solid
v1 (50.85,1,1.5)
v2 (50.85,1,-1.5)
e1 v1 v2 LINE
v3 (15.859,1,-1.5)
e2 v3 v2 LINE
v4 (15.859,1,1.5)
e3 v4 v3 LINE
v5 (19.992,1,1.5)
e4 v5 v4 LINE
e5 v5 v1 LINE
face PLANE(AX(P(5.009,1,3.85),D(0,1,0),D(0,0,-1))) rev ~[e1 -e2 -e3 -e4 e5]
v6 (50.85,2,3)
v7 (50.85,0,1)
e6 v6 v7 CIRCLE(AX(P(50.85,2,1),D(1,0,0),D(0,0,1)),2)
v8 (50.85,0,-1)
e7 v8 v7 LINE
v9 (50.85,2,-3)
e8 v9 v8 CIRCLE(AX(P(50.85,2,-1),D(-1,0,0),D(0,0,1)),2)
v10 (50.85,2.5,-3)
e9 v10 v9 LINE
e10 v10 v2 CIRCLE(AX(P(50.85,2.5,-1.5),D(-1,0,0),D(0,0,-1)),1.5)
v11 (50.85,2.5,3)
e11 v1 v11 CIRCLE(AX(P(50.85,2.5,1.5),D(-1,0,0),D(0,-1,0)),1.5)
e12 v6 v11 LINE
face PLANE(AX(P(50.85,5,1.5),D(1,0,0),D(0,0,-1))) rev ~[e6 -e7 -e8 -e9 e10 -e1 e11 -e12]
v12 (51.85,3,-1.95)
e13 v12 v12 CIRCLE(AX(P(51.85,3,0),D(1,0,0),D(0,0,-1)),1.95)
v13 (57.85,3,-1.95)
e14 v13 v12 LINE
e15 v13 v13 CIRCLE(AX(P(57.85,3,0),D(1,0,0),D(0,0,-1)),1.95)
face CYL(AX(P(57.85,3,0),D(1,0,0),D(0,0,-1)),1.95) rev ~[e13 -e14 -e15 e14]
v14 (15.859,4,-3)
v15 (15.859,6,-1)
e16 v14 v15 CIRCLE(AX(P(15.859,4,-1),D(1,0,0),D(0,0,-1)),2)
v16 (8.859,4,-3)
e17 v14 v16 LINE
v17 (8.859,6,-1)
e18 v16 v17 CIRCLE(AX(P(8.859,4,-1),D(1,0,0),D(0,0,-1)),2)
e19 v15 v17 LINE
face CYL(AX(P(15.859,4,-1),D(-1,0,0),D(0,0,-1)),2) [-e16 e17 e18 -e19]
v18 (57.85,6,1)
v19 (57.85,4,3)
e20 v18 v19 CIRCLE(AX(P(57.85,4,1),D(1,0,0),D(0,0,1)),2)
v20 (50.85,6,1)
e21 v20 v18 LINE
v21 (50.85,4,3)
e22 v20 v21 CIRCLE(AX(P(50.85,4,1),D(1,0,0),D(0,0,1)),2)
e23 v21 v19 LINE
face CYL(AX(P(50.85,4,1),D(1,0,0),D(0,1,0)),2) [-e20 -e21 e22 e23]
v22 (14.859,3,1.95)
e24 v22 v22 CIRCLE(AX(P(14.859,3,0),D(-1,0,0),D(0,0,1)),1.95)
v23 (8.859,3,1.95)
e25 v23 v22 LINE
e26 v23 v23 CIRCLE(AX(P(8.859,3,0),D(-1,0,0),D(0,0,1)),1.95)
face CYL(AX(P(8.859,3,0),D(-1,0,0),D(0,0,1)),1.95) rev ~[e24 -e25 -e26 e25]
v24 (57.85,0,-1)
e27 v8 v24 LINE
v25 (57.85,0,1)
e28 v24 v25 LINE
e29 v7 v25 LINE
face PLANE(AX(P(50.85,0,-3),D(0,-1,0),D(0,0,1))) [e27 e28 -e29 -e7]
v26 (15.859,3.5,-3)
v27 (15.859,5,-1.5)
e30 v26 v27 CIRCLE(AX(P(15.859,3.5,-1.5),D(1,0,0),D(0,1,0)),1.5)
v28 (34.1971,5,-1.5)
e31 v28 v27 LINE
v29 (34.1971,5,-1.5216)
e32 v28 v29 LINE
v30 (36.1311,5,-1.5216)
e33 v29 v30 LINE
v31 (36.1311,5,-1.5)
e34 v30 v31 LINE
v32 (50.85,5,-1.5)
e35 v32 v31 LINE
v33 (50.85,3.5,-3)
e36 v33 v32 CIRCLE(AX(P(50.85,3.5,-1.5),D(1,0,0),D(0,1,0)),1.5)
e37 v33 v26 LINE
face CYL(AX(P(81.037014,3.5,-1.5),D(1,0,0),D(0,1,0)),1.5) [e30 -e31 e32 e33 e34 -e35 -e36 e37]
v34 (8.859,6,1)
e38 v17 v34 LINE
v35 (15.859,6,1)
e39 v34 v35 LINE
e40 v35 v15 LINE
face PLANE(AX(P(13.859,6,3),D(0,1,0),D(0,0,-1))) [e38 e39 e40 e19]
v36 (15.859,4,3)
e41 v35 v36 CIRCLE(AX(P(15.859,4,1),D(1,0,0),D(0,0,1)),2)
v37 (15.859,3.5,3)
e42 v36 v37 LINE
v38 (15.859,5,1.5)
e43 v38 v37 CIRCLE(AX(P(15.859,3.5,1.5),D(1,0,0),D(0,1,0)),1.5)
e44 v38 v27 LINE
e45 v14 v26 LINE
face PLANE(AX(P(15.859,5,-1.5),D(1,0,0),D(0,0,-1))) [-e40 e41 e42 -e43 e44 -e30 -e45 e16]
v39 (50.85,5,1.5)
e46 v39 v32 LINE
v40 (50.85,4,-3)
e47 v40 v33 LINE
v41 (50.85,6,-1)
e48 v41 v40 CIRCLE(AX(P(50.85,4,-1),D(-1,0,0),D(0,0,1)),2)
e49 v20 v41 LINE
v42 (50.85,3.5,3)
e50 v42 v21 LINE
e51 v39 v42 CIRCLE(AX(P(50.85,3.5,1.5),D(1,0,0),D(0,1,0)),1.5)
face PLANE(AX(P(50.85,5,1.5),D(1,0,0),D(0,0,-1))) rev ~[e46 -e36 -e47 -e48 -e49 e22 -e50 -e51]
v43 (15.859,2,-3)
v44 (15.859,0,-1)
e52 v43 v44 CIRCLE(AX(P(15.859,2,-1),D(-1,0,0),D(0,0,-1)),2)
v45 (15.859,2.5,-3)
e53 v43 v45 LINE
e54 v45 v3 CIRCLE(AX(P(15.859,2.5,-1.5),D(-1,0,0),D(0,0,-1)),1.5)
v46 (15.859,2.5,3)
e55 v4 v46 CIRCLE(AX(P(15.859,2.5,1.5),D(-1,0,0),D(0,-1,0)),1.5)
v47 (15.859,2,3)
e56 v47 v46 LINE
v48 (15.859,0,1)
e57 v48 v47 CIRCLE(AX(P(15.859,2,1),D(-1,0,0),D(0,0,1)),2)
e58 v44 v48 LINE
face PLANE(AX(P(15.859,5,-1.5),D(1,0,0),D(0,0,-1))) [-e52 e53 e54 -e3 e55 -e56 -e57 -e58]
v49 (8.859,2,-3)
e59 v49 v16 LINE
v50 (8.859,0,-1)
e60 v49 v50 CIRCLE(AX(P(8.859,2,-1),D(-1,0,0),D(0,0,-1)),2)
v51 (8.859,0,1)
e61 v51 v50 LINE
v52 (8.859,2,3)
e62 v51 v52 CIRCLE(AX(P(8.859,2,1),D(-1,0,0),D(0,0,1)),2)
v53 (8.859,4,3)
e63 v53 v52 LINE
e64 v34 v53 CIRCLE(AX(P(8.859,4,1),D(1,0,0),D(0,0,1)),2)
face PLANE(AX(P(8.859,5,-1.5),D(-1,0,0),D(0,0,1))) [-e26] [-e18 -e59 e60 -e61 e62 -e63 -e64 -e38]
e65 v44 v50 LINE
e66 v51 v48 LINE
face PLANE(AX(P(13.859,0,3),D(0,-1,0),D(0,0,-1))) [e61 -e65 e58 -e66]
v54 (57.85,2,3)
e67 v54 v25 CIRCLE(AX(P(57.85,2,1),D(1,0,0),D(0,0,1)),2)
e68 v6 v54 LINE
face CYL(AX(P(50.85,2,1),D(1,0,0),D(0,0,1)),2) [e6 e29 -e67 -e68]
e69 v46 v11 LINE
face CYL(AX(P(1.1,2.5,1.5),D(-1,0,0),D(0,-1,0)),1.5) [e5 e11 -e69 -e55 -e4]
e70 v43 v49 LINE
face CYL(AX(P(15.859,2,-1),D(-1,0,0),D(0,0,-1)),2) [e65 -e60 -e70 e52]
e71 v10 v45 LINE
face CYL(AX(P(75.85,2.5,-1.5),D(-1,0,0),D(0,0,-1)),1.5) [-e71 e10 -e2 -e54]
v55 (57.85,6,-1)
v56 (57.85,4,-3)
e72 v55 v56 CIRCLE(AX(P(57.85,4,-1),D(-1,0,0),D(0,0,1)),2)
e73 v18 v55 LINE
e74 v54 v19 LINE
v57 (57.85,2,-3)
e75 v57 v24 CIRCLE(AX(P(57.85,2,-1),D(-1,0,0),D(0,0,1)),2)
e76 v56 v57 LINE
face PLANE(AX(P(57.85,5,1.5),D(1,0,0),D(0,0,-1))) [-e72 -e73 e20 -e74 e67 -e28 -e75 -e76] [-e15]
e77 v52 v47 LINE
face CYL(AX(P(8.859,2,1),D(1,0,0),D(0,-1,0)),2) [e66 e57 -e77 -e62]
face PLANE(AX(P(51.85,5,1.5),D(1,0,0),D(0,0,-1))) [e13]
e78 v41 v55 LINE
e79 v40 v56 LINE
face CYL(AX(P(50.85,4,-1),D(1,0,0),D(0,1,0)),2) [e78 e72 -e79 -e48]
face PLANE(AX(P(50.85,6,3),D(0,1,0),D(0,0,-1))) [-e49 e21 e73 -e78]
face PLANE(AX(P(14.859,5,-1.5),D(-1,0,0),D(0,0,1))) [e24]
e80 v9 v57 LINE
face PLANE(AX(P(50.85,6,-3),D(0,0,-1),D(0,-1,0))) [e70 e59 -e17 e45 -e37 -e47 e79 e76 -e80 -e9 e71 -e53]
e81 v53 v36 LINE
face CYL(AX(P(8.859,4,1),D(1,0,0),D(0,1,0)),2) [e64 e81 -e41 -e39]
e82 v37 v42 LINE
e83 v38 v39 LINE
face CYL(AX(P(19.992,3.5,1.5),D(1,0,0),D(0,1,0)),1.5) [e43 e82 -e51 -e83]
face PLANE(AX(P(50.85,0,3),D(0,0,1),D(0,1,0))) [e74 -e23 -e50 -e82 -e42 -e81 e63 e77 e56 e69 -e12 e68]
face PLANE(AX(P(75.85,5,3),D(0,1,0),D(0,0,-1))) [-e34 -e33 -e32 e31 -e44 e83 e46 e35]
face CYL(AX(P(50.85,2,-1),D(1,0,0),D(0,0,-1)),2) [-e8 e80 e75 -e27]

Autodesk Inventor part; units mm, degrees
ref_plane "YZ Plane" through (0, 0, 0) normal (1, 0, 0) x (0, 1, 0)
ref_plane "XZ Plane" through (0, 0, 0) normal (0, 1, 0) x (-1, 0, 0)
ref_plane "XY Plane" through (0, 0, 0) normal (0, 0, 1) x (1, 0, 0)
sketch "Sketch1" plane through (0, 0, 0) normal (0, 1, 0) x (-1, 0, 0)
  point P0 (0, 0)
sketch "Sketch2" plane through (0, 0, 0) normal (0, 1, 0) x (-1, 0, 0)
  circle A0 centre (0, 0) radius 3.85
  dimension "d0" = 7.7
extrude "Extrusion1" add sketch "Sketch2" along normal blind 6
sketch "Sketch3" plane through (0, 6, 0) normal (0, 1, 0) x (1, 0, 0)
  circle A0 centre (0, 0) radius 1
  dimension "d3" = 2
extrude "Extrusion2" cut sketch "Sketch3" against normal through all
sketch "Sketch4" plane through (0, 0, 0) normal (0, -1, 0) x (1, 0, 0)
  circle A0 centre (0, 0) radius 3.85 projected
  line L0 (0, 3.85) -> (3.85, 3.85)
  line L1 (3.85, 3.85) -> (3.85, -3.85)
  line L2 (3.85, -3.85) -> (0, -3.85)
  line L3 (3.85, 3.85) -> (4.85, 3.85)
  line L4 (4.85, 3.85) -> (4.85, -3.85)
  line L5 (4.85, -3.85) -> (3.85, -3.85)
  line L6 (3.85, -3.85) -> (3.85, 3.85)
  line L7 (4.85, 3.85) -> (4.85, 3)
  line L8 (4.85, -3.85) -> (4.85, -3)
  line L9 (4.85, 3) -> (3.85, 3)
  line L10 (3.85, 3) -> (3.85, -3)
  line L11 (3.85, -3) -> (4.85, -3)
  line L12 (4.85, -3) -> (4.85, 3)
  point P0 (3.85, -3)
  dimension "d6" = 1
  dimension "d7" = 0.85
  dimension "d8" = 0.85
extrude "Extrusion3" add sketch "Sketch4" against normal blind 6 contours L1 L9 L4 L11
sketch "Sketch5" plane through (4.85, 0, 3) normal (1, 0, 0) x (0, 0, -1)
  line L0 (6.85, 0) -> (-0.85, 0) projected
  line L1 (6, 0) -> (6, 6) projected
  line L2 (0.0003, 0) -> (6, 0)
  line L3 (6, 0) -> (6, 1)
  line L4 (6, 1) -> (0.0003, 1)
  line L5 (0.0003, 1) -> (0.0003, 0)
  line L6 (6.85, 6) -> (-0.85, 6) projected
  line L7 (0.0003, 6) -> (6, 6)
  line L8 (6, 6) -> (6, 5)
  line L9 (6, 5) -> (0.0003, 5)
  line L10 (0.0003, 5) -> (0.0003, 6)
  point P0 (3, 0)
  point P1 (3, 6)
  dimension "d11" = 1
  dimension "d12" = 1
extrude "Extrusion4" cut sketch "Sketch5" against normal blind 1 contours L9 L10 L6 L1
extrude "Extrusion5" cut sketch "Sketch5" against normal blind 1 contours L0 L5 L4 L1
sketch "Sketch6" plane through (4.85, 5, 2.9997) normal (0, 0, -1) x (-1, 0, 0)
  line L0 (0, 0) -> (1, 0) projected
  line L1 (0, -5) -> (0, 1) projected
  line L2 (1, 0) -> (0, 0)
  line L3 (0, 0) -> (0, 1)
  line L4 (0, 1) -> (1, 1)
  line L5 (1, 1) -> (1, 0)
  line L6 (1, -5) -> (0, -5)
  line L7 (0, -5) -> (0, -3.9916)
  line L8 (0, -3.9916) -> (1, -3.9916)
  line L9 (1, -3.9916) -> (1, -5)
  point P0 (4.85, -5)
extrude "Extrusion6" cut sketch "Sketch6" against normal through all contours L1 L4 L5 L0
extrude "Extrusion7" cut sketch "Sketch6" against normal through all contours L1 L8 L9 L6
sketch "Sketch7" plane through (4.85, 5, 3) normal (1, 0, 0) x (0, 0, -1)
  line L0 (0, 0) -> (3, 0) projected
  line L1 (6, -4) -> (6, 0) projected
  line L2 (0, 0) -> (6, 0)
  line L3 (6, 0) -> (6, -4)
  line L4 (6, -4) -> (0, -4)
  line L5 (0, -4) -> (0, 0)
  point P0 (3, -5)
extrude "Extrusion8" add sketch "Sketch7" along normal blind 71
sketch "Sketch8" plane through (3.85, 1, -3) normal (0, 0, -1) x (-1, 0, 0)
  point P0 (3.85, -1)
sketch "Sketch9" plane through (3.85, 5, 0) normal (0, 1, 0) x (1, 0, 0)
  line L0 (72, 3) -> (72, -3) projected
  line L1 (72, 0) -> (75.85, 0)
  circle A0 centre (75.85, 0) radius 3.85
  point P0 (-3.85, 0)
  dimension "d23" = 3.85
extrude "Extrusion9" add sketch "Sketch9" along normal blind 1
extrude "Extrusion10" add sketch "Sketch9" against normal blind 5
sketch "Sketch10" plane through (79.7, 6, 0) normal (0, 1, 0) x (1, 0, 0)
  circle A0 centre (0, 0) radius 1.85
  point P0 (-79.7, 0)
  dimension "d28" = 3.7
extrude "Extrusion11" cut sketch "Sketch10" against normal through all
sketch "Sketch11" plane through (3.85, 5, 0) normal (-1, 0, 0) x (0, 0, 1)
  point P0 (0, -5)
sketch "Sketch12" plane through (3.85, 5, -3) normal (-1, 0, 0) x (0, 0, 1)
  line L0 (0, 0) -> (3, 0) projected
  line L1 (6, 0) -> (6, -4) projected
  line L2 (0, 0) -> (6, 0)
  line L3 (6, 0) -> (6, -4)
  line L4 (6, -4) -> (0, -4)
  line L5 (0, -4) -> (0, 0)
  point P0 (3, -5)
extrude "Extrusion12" add sketch "Sketch12" along normal blind 2
sketch "Sketch13" plane through (75.85, 5, 3) normal (1, 0, 0) x (0, 0, -1)
  line L0 (3, 0) -> (0, 0) projected
  line L1 (3, -4) -> (6, -4) projected
  line L2 (0, 0) -> (6, 0)
  line L3 (6, 0) -> (6, -4)
  line L4 (6, -4) -> (0, -4)
  line L5 (0, -4) -> (0, 0)
  point P0 (3, -5)
extrude "Extrusion13" add sketch "Sketch13" along normal blind 1.6
fillet "Fillet1" radius 1.5 2 edges at (76.5685, 5, 3) (39.1315, 5, 3)
fillet "Fillet2" radius 1.5 1 edges at (39.85, 5, -3)
fillet "Fillet3" radius 1.5 1 edges at (39.85, 1, -3)
fillet "Fillet4" radius 1.5 3 edges at (4.35, 1, 2.9997) (40.35, 1, 3) (4.85, 1, 2.9998)
sketch "Sketch14" plane through (3.5458, 5, 1.5) normal (0, 1, 0) x (1, 0, 0)
  point P0 (-3.5458, 1.5)
sketch "Sketch15" plane through (3.5458, 5, 1.5) normal (0, 1, 0) x (1, 0, 0)
  line L0 (0.4177, 2.9988) -> (2.9717, 2.9988) construction
  line L1 (2.9717, 2.9988) -> (2.9717, -0.0492) construction
  line L2 (2.9717, -0.0492) -> (0.4177, -0.0492) construction
  line L3 (0.4177, -0.0492) -> (0.4177, 2.9988) construction
  line L4 (0.398, -0.0492) -> (1.4255, 2.9988)
  line L5 (1.4255, 2.9988) -> (1.9244, 2.9988)
  line L6 (1.9244, 2.9988) -> (2.952, -0.0492)
  line L7 (2.952, -0.0492) -> (2.5247, -0.0492)
  line L8 (2.5247, -0.0492) -> (2.248, 0.803)
  line L9 (2.248, 0.803) -> (1.0846, 0.803)
  line L10 (1.0846, 0.803) -> (0.808, -0.0492)
  line L11 (0.808, -0.0492) -> (0.398, -0.0492)
  line L12 (2.1369, 1.1488) -> (1.6651, 2.5839)
  line L13 (1.6651, 2.5839) -> (1.1958, 1.1488)
  line L14 (1.1958, 1.1488) -> (2.1369, 1.1488)
  point P0 (-3.5458, 1.5)
extrude "Extrusion14" add sketch "Sketch15" along normal blind 0.2
sketch "Sketch16" plane through (3.5458, 5, -1.5) normal (0, 1, 0) x (1, 0, 0)
  line L0 (69.8363, -0.0038) -> (72.3064, -0.0038) construction
  line L1 (72.3064, -0.0038) -> (72.3064, -3.0518) construction
  line L2 (72.3064, -3.0518) -> (69.8363, -3.0518) construction
  line L3 (69.8363, -3.0518) -> (69.8363, -0.0038) construction
  spline S0 degree 2 poles (72.2125, -2.1157) (72.2125, -2.3429) (72.0396, -2.6912) (71.8963, -2.8048) knots 0 0 0 1 2 2 2
  spline S1 degree 2 poles (71.8963, -2.8048) (71.7234, -2.9382) (71.3307, -3.0518) (71.0195, -3.0518) knots 0 0 0 1 2 2 2
  line L4 (71.0195, -3.0518) -> (70.1451, -3.0518)
  line L5 (70.1451, -3.0518) -> (70.1451, -0.0038)
  line L6 (70.1451, -0.0038) -> (70.9528, -0.0038)
  spline S2 degree 2 poles (70.9528, -0.0038) (71.2788, -0.0038) (71.6049, -0.0458) (71.7531, -0.1273) knots 0 0 0 1 2 2 2
  spline S3 degree 2 poles (71.7531, -0.1273) (71.9186, -0.2138) (72.0692, -0.4978) (72.0692, -0.6905) knots 0 0 0 1 2 2 2
  spline S4 degree 2 poles (72.0692, -0.6905) (72.0692, -0.9054) (71.842, -1.2462) (71.6419, -1.3426) knots 0 0 0 1 2 2 2
  line L7 (71.6419, -1.3426) -> (71.6419, -1.3574)
  spline S5 degree 2 poles (71.6419, -1.3574) (71.9136, -1.4315) (72.2125, -1.8242) (72.2125, -2.1157) knots 0 0 0 1 2 2 2
  spline S6 degree 2 poles (71.7901, -2.133) (71.7901, -1.9601) (71.6913, -1.7378) (71.5431, -1.6587) knots 0 0 0 1 2 2 2
  spline S7 degree 2 poles (71.5431, -1.6587) (71.4468, -1.6093) (71.2195, -1.5797) (71.0096, -1.5797) knots 0 0 0 1 2 2 2
  line L8 (71.0096, -1.5797) -> (70.5502, -1.5797)
  line L9 (70.5502, -1.5797) -> (70.5502, -2.706)
  line L10 (70.5502, -2.706) -> (70.8787, -2.706)
  spline S8 degree 2 poles (70.8787, -2.706) (71.1454, -2.706) (71.4517, -2.6566) (71.5703, -2.5776) knots 0 0 0 1 2 2 2
  spline S9 degree 2 poles (71.5703, -2.5776) (71.6839, -2.4961) (71.7901, -2.2935) (71.7901, -2.133) knots 0 0 0 1 2 2 2
  spline S10 degree 2 poles (71.6469, -0.7473) (71.6469, -0.6386) (71.5728, -0.4756) (71.4912, -0.4287) knots 0 0 0 1 2 2 2
  spline S11 degree 2 poles (71.4912, -0.4287) (71.3924, -0.3743) (71.1529, -0.3496) (70.938, -0.3496) knots 0 0 0 1 2 2 2
  line L11 (70.938, -0.3496) -> (70.5502, -0.3496)
  line L12 (70.5502, -0.3496) -> (70.5502, -1.2413)
  line L13 (70.5502, -1.2413) -> (71.0096, -1.2413)
  spline S12 degree 2 poles (71.0096, -1.2413) (71.1998, -1.2413) (71.3801, -1.2018) (71.4764, -1.14) knots 0 0 0 1 2 2 2
  spline S13 degree 2 poles (71.4764, -1.14) (71.5703, -1.0807) (71.6469, -0.8905) (71.6469, -0.7473) knots 0 0 0 1 2 2 2
  point P0 (-3.5458, -1.5)
extrude "Extrusion15" add sketch "Sketch16" along normal blind 0.2
sketch "Sketch17" plane through (3.5458, 5, -1.5) normal (0, 1, 0) x (1, 0, 0)
  line L0 (0.4145, -1.5) -> (36.4145, -1.5)
  line L1 (30.4487, 0.0859) -> (55.6072, 0.0859) construction
  line L2 (55.6072, 0.0859) -> (55.6072, -2.5363) construction
  line L3 (55.6072, -2.5363) -> (30.4487, -2.5363) construction
  line L4 (30.4487, -2.5363) -> (30.4487, 0.0859) construction
  line L5 (32.5853, -0.4353) -> (31.2663, -3.0264)
  line L6 (31.2663, -3.0264) -> (30.8316, -3.0264)
  line L7 (30.8316, -3.0264) -> (32.2247, -0.3365)
  line L8 (32.2247, -0.3365) -> (30.6513, -0.3365)
  line L9 (30.6513, -0.3365) -> (30.6513, 0.0216)
  line L10 (30.6513, 0.0216) -> (32.5853, 0.0216)
  line L11 (32.5853, 0.0216) -> (32.5853, -0.4353)
  line L12 (34.838, -3.0264) -> (32.9583, -3.0264)
  line L13 (32.9583, -3.0264) -> (32.9583, -2.5941)
  spline S0 degree 2 poles (32.9583, -2.5941) (33.1608, -2.4039) (33.5214, -2.0507) (33.6943, -1.8605) knots 0 0 0 1 2 2 2
  spline S1 degree 2 poles (33.6943, -1.8605) (34.0426, -1.4777) (34.297, -1.0182) (34.297, -0.7737) knots 0 0 0 1 2 2 2
  spline S2 degree 2 poles (34.297, -0.7737) (34.297, -0.6453) (34.218, -0.4526) (34.1464, -0.3909) knots 0 0 0 1 2 2 2
  spline S3 degree 2 poles (34.1464, -0.3909) (34.0747, -0.3291) (33.887, -0.2674) (33.7734, -0.2674) knots 0 0 0 1 2 2 2
  spline S4 degree 2 poles (33.7734, -0.2674) (33.6647, -0.2674) (33.4424, -0.3217) (33.3411, -0.3637) knots 0 0 0 1 2 2 2
  spline S5 degree 2 poles (33.3411, -0.3637) (33.2547, -0.3983) (33.0941, -0.4971) (33.0447, -0.5317) knots 0 0 0 1 2 2 2
  line L14 (33.0447, -0.5317) -> (33.0225, -0.5317)
  line L15 (33.0225, -0.5317) -> (33.0225, -0.0969)
  spline S6 degree 2 poles (33.0225, -0.0969) (33.1485, -0.0352) (33.6005, 0.0859) (33.803, 0.0859) knots 0 0 0 1 2 2 2
  spline S7 degree 2 poles (33.803, 0.0859) (34.2303, 0.0859) (34.712, -0.3662) (34.712, -0.7515) knots 0 0 0 1 2 2 2
  spline S8 degree 2 poles (34.712, -0.7515) (34.712, -0.9318) (34.628, -1.2331) (34.5539, -1.3616) knots 0 0 0 1 2 2 2
  spline S9 degree 2 poles (34.5539, -1.3616) (34.4798, -1.495) (34.2649, -1.7568) (34.1464, -1.8828) knots 0 0 0 1 2 2 2
  spline S10 degree 2 poles (34.1464, -1.8828) (33.9537, -2.0927) (33.4819, -2.5422) (33.3411, -2.6732) knots 0 0 0 1 2 2 2
  line L16 (33.3411, -2.6732) -> (34.838, -2.6732)
  line L17 (34.838, -2.6732) -> (34.838, -3.0264)
  line L18 (37.8958, -3.0264) -> (37.8958, -1.7024)
  spline S11 degree 2 poles (37.8958, -1.7024) (37.8958, -1.5444) (37.8711, -1.2751) (37.8316, -1.201) knots 0 0 0 1 2 2 2
  spline S12 degree 2 poles (37.8316, -1.201) (37.7921, -1.1195) (37.6414, -1.0405) (37.5105, -1.0405) knots 0 0 0 1 2 2 2
  spline S13 degree 2 poles (37.5105, -1.0405) (37.392, -1.0405) (37.1203, -1.1862) (36.977, -1.3245) knots 0 0 0 1 2 2 2
  spline S14 degree 2 poles (36.977, -1.3245) (36.9795, -1.3591) (36.9844, -1.4554) (36.9844, -1.5197) knots 0 0 0 1 2 2 2
  line L19 (36.9844, -1.5197) -> (36.9844, -3.0264)
  line L20 (36.9844, -3.0264) -> (36.5991, -3.0264)
  line L21 (36.5991, -3.0264) -> (36.5991, -1.7024)
  spline S15 degree 2 poles (36.5991, -1.7024) (36.5991, -1.5444) (36.5744, -1.2751) (36.5349, -1.201) knots 0 0 0 1 2 2 2
  spline S16 degree 2 poles (36.5349, -1.201) (36.4953, -1.1195) (36.3447, -1.0405) (36.2138, -1.0405) knots 0 0 0 1 2 2 2
  spline S17 degree 2 poles (36.2138, -1.0405) (36.0903, -1.0405) (35.8161, -1.1961) (35.6876, -1.3171) knots 0 0 0 1 2 2 2
  line L22 (35.6876, -1.3171) -> (35.6876, -3.0264)
  line L23 (35.6876, -3.0264) -> (35.3023, -3.0264)
  line L24 (35.3023, -3.0264) -> (35.3023, -0.7391)
  line L25 (35.3023, -0.7391) -> (35.6876, -0.7391)
  line L26 (35.6876, -0.7391) -> (35.6876, -0.9911)
  spline S18 degree 2 poles (35.6876, -0.9911) (35.8383, -0.8404) (36.1347, -0.6749) (36.3126, -0.6749) knots 0 0 0 1 2 2 2
  spline S19 degree 2 poles (36.3126, -0.6749) (36.5151, -0.6749) (36.8288, -0.8602) (36.9103, -1.0701) knots 0 0 0 1 2 2 2
  spline S20 degree 2 poles (36.9103, -1.0701) (37.0857, -0.875) (37.4167, -0.6749) (37.6093, -0.6749) knots 0 0 0 1 2 2 2
  spline S21 degree 2 poles (37.6093, -0.6749) (37.7575, -0.6749) (37.9996, -0.7663) (38.0885, -0.87) knots 0 0 0 1 2 2 2
  spline S22 degree 2 poles (38.0885, -0.87) (38.1799, -0.9738) (38.2812, -1.285) (38.2812, -1.5197) knots 0 0 0 1 2 2 2
  line L27 (38.2812, -1.5197) -> (38.2812, -3.0264)
  line L28 (38.2812, -3.0264) -> (37.8958, -3.0264)
  line L29 (41.4156, -3.0264) -> (41.4156, -1.7024)
  spline S23 degree 2 poles (41.4156, -1.7024) (41.4156, -1.5444) (41.3909, -1.2751) (41.3514, -1.201) knots 0 0 0 1 2 2 2
  spline S24 degree 2 poles (41.3514, -1.201) (41.3119, -1.1195) (41.1612, -1.0405) (41.0303, -1.0405) knots 0 0 0 1 2 2 2
  spline S25 degree 2 poles (41.0303, -1.0405) (40.9117, -1.0405) (40.64, -1.1862) (40.4968, -1.3245) knots 0 0 0 1 2 2 2
  spline S26 degree 2 poles (40.4968, -1.3245) (40.4992, -1.3591) (40.5042, -1.4554) (40.5042, -1.5197) knots 0 0 0 1 2 2 2
  line L30 (40.5042, -1.5197) -> (40.5042, -3.0264)
  line L31 (40.5042, -3.0264) -> (40.1189, -3.0264)
  line L32 (40.1189, -3.0264) -> (40.1189, -1.7024)
  spline S27 degree 2 poles (40.1189, -1.7024) (40.1189, -1.5444) (40.0942, -1.2751) (40.0546, -1.201) knots 0 0 0 1 2 2 2
  spline S28 degree 2 poles (40.0546, -1.201) (40.0151, -1.1195) (39.8644, -1.0405) (39.7335, -1.0405) knots 0 0 0 1 2 2 2
  spline S29 degree 2 poles (39.7335, -1.0405) (39.61, -1.0405) (39.3359, -1.1961) (39.2074, -1.3171) knots 0 0 0 1 2 2 2
  line L33 (39.2074, -1.3171) -> (39.2074, -3.0264)
  line L34 (39.2074, -3.0264) -> (38.8221, -3.0264)
  line L35 (38.8221, -3.0264) -> (38.8221, -0.7391)
  line L36 (38.8221, -0.7391) -> (39.2074, -0.7391)
  line L37 (39.2074, -0.7391) -> (39.2074, -0.9911)
  spline S30 degree 2 poles (39.2074, -0.9911) (39.3581, -0.8404) (39.6545, -0.6749) (39.8323, -0.6749) knots 0 0 0 1 2 2 2
  spline S31 degree 2 poles (39.8323, -0.6749) (40.0349, -0.6749) (40.3486, -0.8602) (40.4301, -1.0701) knots 0 0 0 1 2 2 2
  spline S32 degree 2 poles (40.4301, -1.0701) (40.6054, -0.875) (40.9364, -0.6749) (41.1291, -0.6749) knots 0 0 0 1 2 2 2
  spline S33 degree 2 poles (41.1291, -0.6749) (41.2773, -0.6749) (41.5194, -0.7663) (41.6083, -0.87) knots 0 0 0 1 2 2 2
  spline S34 degree 2 poles (41.6083, -0.87) (41.6997, -0.9738) (41.8009, -1.285) (41.8009, -1.5197) knots 0 0 0 1 2 2 2
  line L38 (41.8009, -1.5197) -> (41.8009, -3.0264)
  line L39 (41.8009, -3.0264) -> (41.4156, -3.0264)
  point P0 (-3.5458, -1.5)
  dimension "d43" = 36
extrude "Extrusion16" add sketch "Sketch17" along normal blind 0.2
sketch "Sketch18" plane through (3.5458, 5.2, -1.5) normal (0, 1, 0) x (1, 0, 0)
  line L0 (29.8828, 2.0952) -> (43.3392, 2.0952)
  line L1 (43.3392, 2.0952) -> (43.3392, -5.5663)
  line L2 (43.3392, -5.5663) -> (29.8828, -5.5663)
  line L3 (29.8828, -5.5663) -> (29.8828, 2.0952)
  point P0 (-3.5458, -1.5)
extrude "Extrusion17" cut sketch "Sketch18" against normal blind 0.2
sketch "Sketch19" plane through (3.5458, 5.2, 1.5) normal (0, 1, 0) x (1, 0, 0)
  line L0 (0.3624, -0.1736) -> (3.3783, -0.1736)
  line L1 (3.3783, -0.1736) -> (3.3783, 3.2897)
  line L2 (3.3783, 3.2897) -> (0.3624, 3.2897)
  line L3 (0.3624, 3.2897) -> (0.3624, -0.1736)
  line L4 (72.2697, -0.5369) -> (69.8008, -0.5369)
  line L5 (69.8008, -0.5369) -> (69.8008, 3.7021)
  line L6 (69.8008, 3.7021) -> (72.2697, 3.7021)
  line L7 (72.2697, 3.7021) -> (72.2697, -0.5369)
  point P0 (-3.5458, 1.5)
extrude "Extrusion18" cut sketch "Sketch19" against normal blind 0.2 contours L3 L2 L1 L0
extrude "Extrusion19" cut sketch "Sketch19" against normal blind 0.2 contours L4 L5 L6 L7
sketch "Sketch20" plane through (79.7, 0, 0) normal (0, -1, 0) x (1, 0, 0)
  point P0 (-79.7, 0)
sketch "Sketch21" plane through (79.7, 6, 0) normal (0, 1, 0) x (1, 0, 0)
  circle A0 centre (0, 0) radius 1.95
  point P0 (-79.7, 0)
  dimension "d52" = 3.9
extrude "Extrusion20" cut sketch "Sketch21" against normal through all
sketch "Sketch22" plane through (0, 6, 0) normal (0, 1, 0) x (1, 0, 0)
  line L0 (0, 0) -> (0, -3.85)
  circle A0 centre (0, 0) radius 3.85 projected
  line L1 (0, -3.85) -> (3.85, -3.85)
  line L2 (3.85, -3.85) -> (-3.85, -3.85)
  line L3 (-3.85, -3.85) -> (-3.85, 3.85)
  line L4 (-3.85, 3.85) -> (3.85, 3.85)
  line L5 (3.85, 3.85) -> (3.85, -3.85)
extrude "Extrusion21" cut sketch "Sketch22" against normal through all contours A0
sketch "Sketch23" plane through (79.7, 5, 0) normal (0, 1, 0) x (1, 0, 0)
  arc A0 (-76.1542, -1.5) -> (-76.1542, 1.5) centre (-79.7, 0) ccw projected
  line L0 (-75.85, 0) -> (-77.9753, 0)
  line L1 (-77.9753, 0) -> (-77.9753, 3.5992)
  line L2 (-77.9753, 3.5992) -> (-75.85, 3.5992)
  line L3 (-75.85, 3.5992) -> (-75.85, 0)
  line L4 (-75.85, 0) -> (-77.9753, 0)
  line L5 (-77.9753, 0) -> (-77.9753, -3.4561)
  line L6 (-77.9753, -3.4561) -> (-75.85, -3.4561)
  line L7 (-75.85, -3.4561) -> (-75.85, 0)
  line L8 (-75.85, -3.4561) -> (-65.85, -3.4561)
  line L9 (-65.85, -3.4561) -> (-65.85, 3.5992)
  line L10 (-65.85, 3.5992) -> (-75.85, 3.5992)
  line L11 (-75.85, 3.5992) -> (-75.85, -3.4561)
  dimension "d57" = 10
extrude "Extrusion22" cut sketch "Sketch23" against normal through all contours L3 L10 L9 L8 L7
extrude "Extrusion23" cut sketch "Sketch23" against normal through all contours L7 L6 L5 L0
extrude "Extrusion24" cut sketch "Sketch23" against normal through all contours L0 L1 L2 L3
sketch "Sketch24" plane through (13.85, 5, -1.5) normal (-1, 0, 0) x (0, 0, 1)
  line L0 (-2.9013, -5) -> (5.7799, -5)
  line L1 (5.7799, -5) -> (5.7799, 1.344)
  line L2 (5.7799, 1.344) -> (-2.9013, 1.344)
  line L3 (-2.9013, 1.344) -> (-2.9013, -5)
  point P0 (1.5, -5)
extrude "Extrusion25" cut sketch "Sketch24" against normal blind 6.142
sketch "Sketch25" plane through (19.992, 5, -1.5) normal (-1, 0, 0) x (0, 0, 1)
  line L0 (-1.5, 0) -> (4.5, 0)
  line L1 (4.5, 0) -> (4.5, -4)
  line L2 (4.5, -4) -> (-1.5, -4)
  line L3 (-1.5, -4) -> (-1.5, 0)
  point P0 (1.5, -5)
  dimension "d66" = 6
  dimension "d67" = 4
extrude "Extrusion26" add sketch "Sketch25" along normal blind 6.133
sketch "Sketch26" plane through (79.7, 6, 0) normal (0, 1, 0) x (1, 0, 0)
  line L0 (-65.841, -3) -> (-65.841, 3) projected
  line L1 (-65.841, 0) -> (-69.691, 0)
  circle A0 centre (-69.691, 0) radius 3.85
  point P0 (-79.7, 0)
  dimension "d70" = 3.85
extrude "Extrusion27" add sketch "Sketch26" against normal blind 6
sketch "Sketch27" plane through (13.859, 5, -1.5) normal (-1, 0, 0) x (0, 0, 1)
  point P0 (1.5, -5)
sketch "Sketch28" plane through (13.859, 5, -1.5) normal (-1, 0, 0) x (0, 0, 1)
  line L0 (-1.5, 0) -> (-1.5, -4) projected
  line L1 (4.5, 0) -> (3, 0) projected
  line L2 (-1.5, -4) -> (4.5, -4)
  line L3 (4.5, -4) -> (4.5, 0)
  line L4 (4.5, 0) -> (-1.5, 0)
  line L5 (-1.5, 0) -> (-1.5, -4)
  point P0 (1.5, -5)
extrude "Extrusion28" add sketch "Sketch28" along normal blind 5
sketch "Sketch29" plane through (19.992, 3.5, 3) normal (0, 0, 1) x (1, 0, 0)
  point P0 (-19.992, -3.5)
sketch "Sketch30" plane through (79.7, 5, 0) normal (0, 1, 0) x (1, 0, 0)
  point P0 (-79.7, 0)
sketch "Sketch31" plane through (19.992, 5, -1.5) normal (1, 0, 0) x (0, 0, -1)
  arc A0 (-3, 0) -> (-4.5, -1.5) centre (-3, -1.5) ccw projected
  circle A1 centre (-3, -1.5) radius 1.5
  circle A2 centre (-3, -1.5) radius 1.5
  arc A3 (-4.5, -2.5) -> (-3, -4) centre (-3, -2.5) ccw projected
  circle A4 centre (-3, -2.5) radius 1.5
  arc A5 (0, -4) -> (1.5, -2.5) centre (0, -2.5) ccw projected
  circle A6 centre (0, -2.5) radius 1.5
  arc A7 (1.5, -1.5) -> (0, 0) centre (0, -1.5) ccw projected
  circle A8 centre (0, -1.5) radius 1.5
  line L0 (-4.5, -1.5) -> (-4.5, 0) projected
  line L1 (-4.5, 0) -> (-3, 0)
  line L2 (-3, 0) -> (-3, -1.5)
  line L3 (-3, -1.5) -> (-4.5, -1.5)
  line L4 (-4.5, -1.5) -> (-4.5, 0)
  line L5 (0, 0) -> (1.5, 0)
  line L6 (1.5, 0) -> (1.5, -1.5)
  line L7 (1.5, -1.5) -> (0, -1.5)
  line L8 (0, -1.5) -> (0, 0)
  line L9 (-3, -4) -> (-4.5, -4)
  line L10 (-4.5, -4) -> (-4.5, -2.5)
  line L11 (-4.5, -2.5) -> (-3, -2.5)
  line L12 (-3, -2.5) -> (-3, -4)
  line L13 (0, -4) -> (1.5, -4)
  line L14 (1.5, -4) -> (1.5, -2.5)
  line L15 (1.5, -2.5) -> (0, -2.5)
  line L16 (0, -2.5) -> (0, -4)
  point P0 (-1.5, -5)
extrude "Extrusion29" cut sketch "Sketch31" against normal blind 10 contours A0 L0 L1
extrude "Extrusion30" cut sketch "Sketch31" against normal blind 10 contours A3 L9 L10
extrude "Extrusion31" cut sketch "Sketch31" against normal blind 10 contours A5 L14 L13
extrude "Extrusion32" cut sketch "Sketch31" against normal blind 10 contours L5 L6 A7
sketch "Sketch32" plane through (79.7, 6, 0) normal (0, 1, 0) x (1, 0, 0)
  point P0 (-79.7, 0)
sketch "Sketch33" plane through (10.009, 6, 0) normal (0, 1, 0) x (1, 0, 0)
  circle A0 centre (0, 0) radius 3.85
  point P0 (-10.009, 0)
extrude "Extrusion33" add sketch "Sketch33" against normal blind 6
sketch "Sketch34" plane through (10.009, 6, 0) normal (0, 1, 0) x (1, 0, 0)
  circle A0 centre (0, 0) radius 1.925
  point P0 (-10.009, 0)
  dimension "d85" = 3.85
extrude "Extrusion34" cut sketch "Sketch34" against normal blind 6
sketch "Sketch35" plane through (10.009, 6, 0) normal (0, 1, 0) x (1, 0, 0)
  point P0 (-10.009, 0)
sketch "Sketch36" plane through (79.7, 6, 0) normal (0, 1, 0) x (1, 0, 0)
  point P0 (-79.7, 0)
sketch "Sketch37" plane through (79.7, 6, 0) normal (0, 1, 0) x (1, 0, 0)
  point P0 (-79.7, 0)
sketch "Sketch38" plane through (10.009, 6, 0) normal (0, 1, 0) x (1, 0, 0)
  circle A0 centre (0, 0) radius 1.95
  point P0 (-10.009, 0)
  dimension "d89" = 3.9
extrude "Extrusion35" cut sketch "Sketch38" against normal blind 6
sketch "Sketch39" plane through (79.7, 6, 0) normal (0, 1, 0) x (1, 0, 0)
  point P0 (-79.7, 0)
sketch "Sketch40" plane through (79.7, 6, 0) normal (0, 1, 0) x (1, 0, 0)
  point P0 (-79.7, 0)
sketch "Sketch41" plane through (79.7, 6, 0) normal (0, 1, 0) x (1, 0, 0)
  point P0 (-79.7, 0)
sketch "Sketch42" plane through (79.7, 6, 0) normal (0, 1, 0) x (1, 0, 0)
  circle A0 centre (0, 0) radius 3
  arc A1 (-66.1452, -1.5) -> (-66.1452, 1.5) centre (-69.691, 0) ccw projected
  circle A2 centre (-69.691, 0) radius 3
  point P0 (-79.7, 0)
  dimension "d92" = 6
  dimension "d93" = 6
extrude "Extrusion36" cut sketch "Sketch42" against normal through all contours A0
extrude "Extrusion37" cut sketch "Sketch42" against normal through all contours A2
sketch "Sketch43" plane through (10.009, 0, 0) normal (0, -1, 0) x (1, 0, 0)
  circle A0 centre (0, 0) radius 3.85 projected
  line L0 (0, 3.85) -> (-5, 3.85)
  line L1 (-5, 3.85) -> (-5, -3.85)
  line L2 (-5, -3.85) -> (0, -3.85)
  line L3 (0, -3.85) -> (0, 3.85)
  line L4 (-5, 3.85) -> (-4.5, 3.85)
  line L5 (-4.5, 3.85) -> (-4.5, -3.85)
  line L6 (-4.5, -3.85) -> (-5, -3.85)
  line L7 (-5, -3.85) -> (-5, 3.85)
  point P0 (-10.009, 0)
  dimension "d98" = 5
  dimension "d99" = 0.5
extrude "Extrusion38" add sketch "Sketch43" against normal blind 1 contours L5 L2 L1 L0
sketch "Sketch44" plane through (5.009, 0, -3.85) normal (-1, 0, 0) x (0, 0, 1)
  point P0 (3.85, 0)
sketch "Sketch45" plane through (5.009, 0, -3.85) normal (-1, 0, 0) x (0, 0, 1)
  line L0 (7.7, 1) -> (0, 1) projected
  line L1 (0, 0) -> (7.7, 0) projected
  line L2 (0, 1) -> (7.7, 1)
  line L3 (7.7, 1) -> (7.7, 0)
  line L4 (7.7, 0) -> (0, 0)
  line L5 (0, 0) -> (0, 1)
  point P0 (3.85, 0)
extrude "Extrusion39" cut sketch "Sketch45" against normal through all
sketch "Sketch46" plane through (10.009, 6, 0) normal (0, 1, 0) x (1, 0, 0)
  circle A0 centre (0, 0) radius 3.85 projected
  line L0 (0, 3.85) -> (-5, 3.85)
  line L1 (-5, 3.85) -> (-5, -3.85)
  line L2 (-5, -3.85) -> (0, -3.85)
  line L3 (0, -3.85) -> (0, 3.85)
  line L4 (-5, 3.85) -> (-4.5, 3.85)
  line L5 (-4.5, 3.85) -> (-4.5, -3.85)
  line L6 (-4.5, -3.85) -> (-5, -3.85)
  line L7 (-5, -3.85) -> (-5, 3.85)
  point P0 (-10.009, 0)
  dimension "d104" = 5
  dimension "d105" = 0.5
extrude "Extrusion40" add sketch "Sketch46" against normal blind 1 contours L5 L2 L1 L0
sketch "Sketch47" plane through (5.009, 6, -3.85) normal (-1, 0, 0) x (0, 0, 1)
  line L0 (0, 0) -> (0, -1) projected
  line L1 (0, -1) -> (7.7, -1) projected
  line L2 (0, 0) -> (7.7, 0)
  line L3 (7.7, 0) -> (7.7, -1)
  line L4 (7.7, -1) -> (0, -1)
  line L5 (0, -1) -> (0, 0)
  point P0 (3.85, -6)
extrude "Extrusion41" cut sketch "Sketch47" against normal through all
sketch "Sketch48" plane through (12.422, 2.5, 3) normal (0, 0, 1) x (1, 0, 0)
  line L0 (1.1328, 2.5) -> (63.7322, 2.5) projected
  line L1 (1.1328, -1.5) -> (63.7322, -1.5) projected
  line L2 (63.7322, 2.5) -> (63.7322, -1.5)
  line L3 (63.7322, 2.5) -> (71.128, 2.5) projected
  line L4 (71.128, 2.5) -> (63.7322, -1.5)
  line L5 (63.7322, 2.5) -> (71.128, -1.5)
  line L6 (71.128, -1.5) -> (71.128, 2.5) projected
  circle A0 centre (67.4301, 0.5) radius 4.2041
  line L7 (67.4301, 0.5) -> (67.4301, -1.5)
  line L8 (64.278, -1.5) -> (70.278, -1.5) projected
  line L9 (70.278, 2.5) -> (70.278, -1.5) projected
  line L10 (71.128, 0.6263) -> (70.278, 0.6263)
  line L11 (63.7322, 0.5) -> (64.5822, 0.5)
  line L12 (64.5822, 2.5) -> (64.5822, -1.5)
  line L13 (70.278, 2.5) -> (70.278, -1.5)
  line L14 (64.5822, 2.5) -> (70.278, -1.5)
  line L15 (70.278, 2.5) -> (64.5822, -1.5)
  circle A1 centre (67.4301, 0.5) radius 3.48
  line L16 (63.7322, 2.5) -> (71.128, 2.5)
  point P0 (-12.422, -2.5)
  dimension "d110" = 4
  dimension "d111" = 0.85
extrude "Extrusion42" add sketch "Sketch48" against normal blind 6 contours A0 L3 A1
sketch "Sketch49" plane through (12.422, 2.5, 3) normal (0, 0, 1) x (1, 0, 0)
  line L0 (71.128, 2.5) -> (61.853, 2.5)
  line L1 (61.853, 2.5) -> (61.853, 6.3445)
  line L2 (61.853, 6.3445) -> (71.128, 6.3445)
  line L3 (71.128, 6.3445) -> (71.128, 2.5)
  point P0 (-12.422, -2.5)
extrude "Extrusion43" cut sketch "Sketch49" against normal through all
sketch "Sketch50" plane through (79.7, 5, 0) normal (0, 1, 0) x (1, 0, 0)
  arc A0 (-3.5458, -1.5) -> (-3.5458, 1.5) centre (0, 0) ccw projected
  line L0 (0, -3.85) -> (3.85, -3.85)
  circle A1 centre (0, 0) radius 3.85
  line L1 (0, 3.85) -> (-3.85, 3.85)
  line L2 (-3.85, 3.85) -> (3.85, 3.85)
  line L3 (3.85, 3.85) -> (3.85, -3.85)
  line L4 (3.85, -3.85) -> (-3.85, -3.85)
  line L5 (-3.85, -3.85) -> (-3.85, 3.85)
  circle A2 centre (-69.691, 0) radius 3 projected
  arc A3 (-66.1452, 1.5) -> (-66.1452, -1.5) centre (-69.691, 0) ccw projected
  circle A4 centre (-69.691, 0) radius 3.85
  line L6 (-69.691, 3.85) -> (-73.541, 3.85)
  line L7 (-73.541, 3.85) -> (-65.841, 3.85)
  line L8 (-65.841, 3.85) -> (-65.841, -3.85)
  line L9 (-65.841, -3.85) -> (-73.541, -3.85)
  line L10 (-73.541, -3.85) -> (-73.541, 3.85)
  point P0 (-79.7, 0)
  point P1 (-3.85, 0)
  point P2 (-3.5458, -1.5)
  point P3 (-3.5458, 1.5)
  point P4 (-69.691, -3.85)
  point P5 (-65.841, 0)
  point P6 (-66.1452, -1.5)
extrude "Extrusion44" cut sketch "Sketch50" against normal blind 10 contours A0 L4 L5 A1
extrude "Extrusion45" cut sketch "Sketch50" against normal blind 10 contours L5 L1 A0 A1
extrude "Extrusion46" cut sketch "Sketch50" against normal blind 10 contours A1 A0
extrude "Extrusion47" cut sketch "Sketch50" against normal blind 10 contours L8 L9 A3 A4
extrude "Extrusion48" cut sketch "Sketch50" against normal blind 10 contours A3 L7 L8 A4
extrude "Extrusion49" cut sketch "Sketch50" against normal blind 10 contours A4 A3
sketch "Sketch51" plane through (75.85, 5, 1.5) normal (1, 0, 0) x (0, 0, -1)
  line L0 (-1.5, 0) -> (4.5, 0)
  line L1 (4.5, 0) -> (4.5, -5)
  line L2 (4.5, -5) -> (-1.5, -5)
  line L3 (-1.5, -5) -> (-1.5, 0)
  line L4 (-1.5, 0) -> (4.5, 0)
  line L5 (4.5, 0) -> (4.5, 1)
  line L6 (4.5, 1) -> (-1.5, 1)
  line L7 (-1.5, 1) -> (-1.5, 0)
  point P0 (1.5, -5)
  point P1 (4.5, 0)
  dimension "d128" = 5
  dimension "d129" = 1
extrude "Extrusion50" add sketch "Sketch51" along normal blind 5 contours L0 L1 L2 L3
extrude "Extrusion51" add sketch "Sketch51" along normal blind 5 contours L7 L6 L5 L0
sketch "Sketch52" plane through (13.859, 5, -1.5) normal (-1, 0, 0) x (0, 0, 1)
  line L0 (-1.5, -5) -> (-1.5, 1) projected
  line L1 (4.5, -5) -> (-1.5, -5) projected
  line L2 (-1.5, 1) -> (4.5, 1)
  line L3 (4.5, 1) -> (4.5, -5)
  line L4 (4.5, -5) -> (-1.5, -5)
  line L5 (-1.5, -5) -> (-1.5, 1)
  point P0 (1.5, -5)
extrude "Extrusion52" add sketch "Sketch52" along normal blind 5
sketch "Sketch53" plane through (13.859, 5, -1.5) normal (1, 0, 0) x (0, 0, -1)
  line L0 (-4.5, 1) -> (-4.5, -1.5) projected
  line L1 (1.5, -5) -> (1.5, -2.5) projected
  line L2 (-4.5, 1) -> (1.5, 1)
  line L3 (1.5, 1) -> (1.5, -5)
  line L4 (1.5, -5) -> (-4.5, -5)
  line L5 (-4.5, -5) -> (-4.5, 1)
  point P0 (-1.5, -5)
extrude "Extrusion53" add sketch "Sketch53" along normal blind 2
sketch "Sketch54" plane through (75.85, 5, 1.5) normal (-1, 0, 0) x (0, 0, 1)
  line L0 (-4.5, -5) -> (1.5, -5) projected
  line L1 (1.5, 1) -> (-4.5, 1) projected
  line L2 (-4.5, -5) -> (1.5, -5)
  line L3 (1.5, -5) -> (1.5, 1)
  line L4 (1.5, 1) -> (-4.5, 1)
  line L5 (-4.5, 1) -> (-4.5, -5)
  point P0 (-1.5, -5)
extrude "Extrusion54" add sketch "Sketch54" along normal blind 2
sketch "Sketch55" plane through (80.85, 5, 1.5) normal (1, 0, 0) x (0, 0, -1)
  circle A0 centre (1.5, -2) radius 1.95
  point P0 (1.5, -5)
  dimension "d140" = 3.9
extrude "Extrusion55" cut sketch "Sketch55" against normal blind 6
sketch "Sketch56" plane through (8.859, 5, -1.5) normal (-1, 0, 0) x (0, 0, 1)
  circle A0 centre (1.5, -2) radius 1.95
  point P0 (1.5, -5)
  dimension "d143" = 3.9
extrude "Extrusion56" cut sketch "Sketch56" against normal blind 6
fillet "Fillet5" radius 2 4 edges at (12.359, 6, 3) (12.359, 0, 3) (12.359, 6, -3) (12.359, 0, -3)
fillet "Fillet6" radius 2 4 edges at (77.35, 6, 3) (77.35, 6, -3) (77.35, 0, -3) (77.35, 0, 3)
sketch "Sketch57" plane through (80.85, 5, 1.5) normal (1, 0, 0) x (0, 0, -1)
  line L0 (-1.5, 1) -> (4.5, 1)
  line L1 (4.5, 1) -> (4.5, -5)
  line L2 (4.5, -5) -> (-1.5, -5)
  line L3 (-1.5, -5) -> (-1.5, 1)
  point P0 (1.5, -5)
  dimension "d148" = 6
  dimension "d149" = 6
extrude "Extrusion57" cut sketch "Sketch57" against normal blind 22
sketch "Sketch58" plane through (58.85, 5, 1.5) normal (1, 0, 0) x (0, 0, -1)
  line L0 (-1.5, 1) -> (4.5, 1)
  line L1 (4.5, 1) -> (4.5, -5)
  line L2 (4.5, -5) -> (-1.5, -5)
  line L3 (-1.5, -5) -> (-1.5, 1)
  point P0 (1.5, -5)
  dimension "d152" = 6
extrude "Extrusion58" add sketch "Sketch58" along normal blind 7
sketch "Sketch59" plane through (65.85, 5, 1.5) normal (1, 0, 0) x (0, 0, -1)
  circle A0 centre (1.5, -2) radius 1.95
  point P0 (1.5, -5)
  dimension "d155" = 3.9
extrude "Extrusion59" cut sketch "Sketch59" against normal blind 6
fillet "Fillet7" radius 2 1 edges at (62.35, 6, 3)
fillet "Fillet8" radius 2 1 edges at (62.35, 0, 3)
fillet "Fillet9" radius 2 1 edges at (62.35, 0, -3)
fillet "Fillet10" radius 2 1 edges at (62.35, 6, -3)
sketch "Sketch60" plane through (65.85, 5, 1.5) normal (1, 0, 0) x (0, 0, -1)
  line L0 (-1.5, 1) -> (4.5, 1)
  line L1 (4.5, 1) -> (4.5, -5)
  line L2 (4.5, -5) -> (-1.5, -5)
  line L3 (-1.5, -5) -> (-1.5, 1)
  point P0 (1.5, -5)
  dimension "d162" = 6
  dimension "d163" = 6
extrude "Extrusion60" cut sketch "Sketch60" against normal blind 15
sketch "Sketch61" plane through (50.85, 5, 1.5) normal (1, 0, 0) x (0, 0, -1)
  line L0 (-1.5, 1) -> (4.5, 1)
  line L1 (4.5, 1) -> (4.5, -5)
  line L2 (4.5, -5) -> (-1.5, -5)
  line L3 (-1.5, -5) -> (-1.5, 1)
  point P0 (1.5, -5)
  dimension "d166" = 6
  dimension "d167" = 6
extrude "Extrusion61" add sketch "Sketch61" along normal blind 7
fillet "Fillet11" radius 2 1 edges at (54.35, 6, 3)
fillet "Fillet12" radius 2 3 edges at (54.35, 0, 3) (54.35, 6, -3) (54.35, 0, -3)
sketch "Sketch62" plane through (57.85, 5, 1.5) normal (1, 0, 0) x (0, 0, -1)
  circle A0 centre (1.5, -2) radius 1.95
  point P0 (1.5, -5)
  dimension "d172" = 3.9
extrude "Extrusion62" cut sketch "Sketch62" against normal blind 6
properties part number "Part3_3DPrint"
